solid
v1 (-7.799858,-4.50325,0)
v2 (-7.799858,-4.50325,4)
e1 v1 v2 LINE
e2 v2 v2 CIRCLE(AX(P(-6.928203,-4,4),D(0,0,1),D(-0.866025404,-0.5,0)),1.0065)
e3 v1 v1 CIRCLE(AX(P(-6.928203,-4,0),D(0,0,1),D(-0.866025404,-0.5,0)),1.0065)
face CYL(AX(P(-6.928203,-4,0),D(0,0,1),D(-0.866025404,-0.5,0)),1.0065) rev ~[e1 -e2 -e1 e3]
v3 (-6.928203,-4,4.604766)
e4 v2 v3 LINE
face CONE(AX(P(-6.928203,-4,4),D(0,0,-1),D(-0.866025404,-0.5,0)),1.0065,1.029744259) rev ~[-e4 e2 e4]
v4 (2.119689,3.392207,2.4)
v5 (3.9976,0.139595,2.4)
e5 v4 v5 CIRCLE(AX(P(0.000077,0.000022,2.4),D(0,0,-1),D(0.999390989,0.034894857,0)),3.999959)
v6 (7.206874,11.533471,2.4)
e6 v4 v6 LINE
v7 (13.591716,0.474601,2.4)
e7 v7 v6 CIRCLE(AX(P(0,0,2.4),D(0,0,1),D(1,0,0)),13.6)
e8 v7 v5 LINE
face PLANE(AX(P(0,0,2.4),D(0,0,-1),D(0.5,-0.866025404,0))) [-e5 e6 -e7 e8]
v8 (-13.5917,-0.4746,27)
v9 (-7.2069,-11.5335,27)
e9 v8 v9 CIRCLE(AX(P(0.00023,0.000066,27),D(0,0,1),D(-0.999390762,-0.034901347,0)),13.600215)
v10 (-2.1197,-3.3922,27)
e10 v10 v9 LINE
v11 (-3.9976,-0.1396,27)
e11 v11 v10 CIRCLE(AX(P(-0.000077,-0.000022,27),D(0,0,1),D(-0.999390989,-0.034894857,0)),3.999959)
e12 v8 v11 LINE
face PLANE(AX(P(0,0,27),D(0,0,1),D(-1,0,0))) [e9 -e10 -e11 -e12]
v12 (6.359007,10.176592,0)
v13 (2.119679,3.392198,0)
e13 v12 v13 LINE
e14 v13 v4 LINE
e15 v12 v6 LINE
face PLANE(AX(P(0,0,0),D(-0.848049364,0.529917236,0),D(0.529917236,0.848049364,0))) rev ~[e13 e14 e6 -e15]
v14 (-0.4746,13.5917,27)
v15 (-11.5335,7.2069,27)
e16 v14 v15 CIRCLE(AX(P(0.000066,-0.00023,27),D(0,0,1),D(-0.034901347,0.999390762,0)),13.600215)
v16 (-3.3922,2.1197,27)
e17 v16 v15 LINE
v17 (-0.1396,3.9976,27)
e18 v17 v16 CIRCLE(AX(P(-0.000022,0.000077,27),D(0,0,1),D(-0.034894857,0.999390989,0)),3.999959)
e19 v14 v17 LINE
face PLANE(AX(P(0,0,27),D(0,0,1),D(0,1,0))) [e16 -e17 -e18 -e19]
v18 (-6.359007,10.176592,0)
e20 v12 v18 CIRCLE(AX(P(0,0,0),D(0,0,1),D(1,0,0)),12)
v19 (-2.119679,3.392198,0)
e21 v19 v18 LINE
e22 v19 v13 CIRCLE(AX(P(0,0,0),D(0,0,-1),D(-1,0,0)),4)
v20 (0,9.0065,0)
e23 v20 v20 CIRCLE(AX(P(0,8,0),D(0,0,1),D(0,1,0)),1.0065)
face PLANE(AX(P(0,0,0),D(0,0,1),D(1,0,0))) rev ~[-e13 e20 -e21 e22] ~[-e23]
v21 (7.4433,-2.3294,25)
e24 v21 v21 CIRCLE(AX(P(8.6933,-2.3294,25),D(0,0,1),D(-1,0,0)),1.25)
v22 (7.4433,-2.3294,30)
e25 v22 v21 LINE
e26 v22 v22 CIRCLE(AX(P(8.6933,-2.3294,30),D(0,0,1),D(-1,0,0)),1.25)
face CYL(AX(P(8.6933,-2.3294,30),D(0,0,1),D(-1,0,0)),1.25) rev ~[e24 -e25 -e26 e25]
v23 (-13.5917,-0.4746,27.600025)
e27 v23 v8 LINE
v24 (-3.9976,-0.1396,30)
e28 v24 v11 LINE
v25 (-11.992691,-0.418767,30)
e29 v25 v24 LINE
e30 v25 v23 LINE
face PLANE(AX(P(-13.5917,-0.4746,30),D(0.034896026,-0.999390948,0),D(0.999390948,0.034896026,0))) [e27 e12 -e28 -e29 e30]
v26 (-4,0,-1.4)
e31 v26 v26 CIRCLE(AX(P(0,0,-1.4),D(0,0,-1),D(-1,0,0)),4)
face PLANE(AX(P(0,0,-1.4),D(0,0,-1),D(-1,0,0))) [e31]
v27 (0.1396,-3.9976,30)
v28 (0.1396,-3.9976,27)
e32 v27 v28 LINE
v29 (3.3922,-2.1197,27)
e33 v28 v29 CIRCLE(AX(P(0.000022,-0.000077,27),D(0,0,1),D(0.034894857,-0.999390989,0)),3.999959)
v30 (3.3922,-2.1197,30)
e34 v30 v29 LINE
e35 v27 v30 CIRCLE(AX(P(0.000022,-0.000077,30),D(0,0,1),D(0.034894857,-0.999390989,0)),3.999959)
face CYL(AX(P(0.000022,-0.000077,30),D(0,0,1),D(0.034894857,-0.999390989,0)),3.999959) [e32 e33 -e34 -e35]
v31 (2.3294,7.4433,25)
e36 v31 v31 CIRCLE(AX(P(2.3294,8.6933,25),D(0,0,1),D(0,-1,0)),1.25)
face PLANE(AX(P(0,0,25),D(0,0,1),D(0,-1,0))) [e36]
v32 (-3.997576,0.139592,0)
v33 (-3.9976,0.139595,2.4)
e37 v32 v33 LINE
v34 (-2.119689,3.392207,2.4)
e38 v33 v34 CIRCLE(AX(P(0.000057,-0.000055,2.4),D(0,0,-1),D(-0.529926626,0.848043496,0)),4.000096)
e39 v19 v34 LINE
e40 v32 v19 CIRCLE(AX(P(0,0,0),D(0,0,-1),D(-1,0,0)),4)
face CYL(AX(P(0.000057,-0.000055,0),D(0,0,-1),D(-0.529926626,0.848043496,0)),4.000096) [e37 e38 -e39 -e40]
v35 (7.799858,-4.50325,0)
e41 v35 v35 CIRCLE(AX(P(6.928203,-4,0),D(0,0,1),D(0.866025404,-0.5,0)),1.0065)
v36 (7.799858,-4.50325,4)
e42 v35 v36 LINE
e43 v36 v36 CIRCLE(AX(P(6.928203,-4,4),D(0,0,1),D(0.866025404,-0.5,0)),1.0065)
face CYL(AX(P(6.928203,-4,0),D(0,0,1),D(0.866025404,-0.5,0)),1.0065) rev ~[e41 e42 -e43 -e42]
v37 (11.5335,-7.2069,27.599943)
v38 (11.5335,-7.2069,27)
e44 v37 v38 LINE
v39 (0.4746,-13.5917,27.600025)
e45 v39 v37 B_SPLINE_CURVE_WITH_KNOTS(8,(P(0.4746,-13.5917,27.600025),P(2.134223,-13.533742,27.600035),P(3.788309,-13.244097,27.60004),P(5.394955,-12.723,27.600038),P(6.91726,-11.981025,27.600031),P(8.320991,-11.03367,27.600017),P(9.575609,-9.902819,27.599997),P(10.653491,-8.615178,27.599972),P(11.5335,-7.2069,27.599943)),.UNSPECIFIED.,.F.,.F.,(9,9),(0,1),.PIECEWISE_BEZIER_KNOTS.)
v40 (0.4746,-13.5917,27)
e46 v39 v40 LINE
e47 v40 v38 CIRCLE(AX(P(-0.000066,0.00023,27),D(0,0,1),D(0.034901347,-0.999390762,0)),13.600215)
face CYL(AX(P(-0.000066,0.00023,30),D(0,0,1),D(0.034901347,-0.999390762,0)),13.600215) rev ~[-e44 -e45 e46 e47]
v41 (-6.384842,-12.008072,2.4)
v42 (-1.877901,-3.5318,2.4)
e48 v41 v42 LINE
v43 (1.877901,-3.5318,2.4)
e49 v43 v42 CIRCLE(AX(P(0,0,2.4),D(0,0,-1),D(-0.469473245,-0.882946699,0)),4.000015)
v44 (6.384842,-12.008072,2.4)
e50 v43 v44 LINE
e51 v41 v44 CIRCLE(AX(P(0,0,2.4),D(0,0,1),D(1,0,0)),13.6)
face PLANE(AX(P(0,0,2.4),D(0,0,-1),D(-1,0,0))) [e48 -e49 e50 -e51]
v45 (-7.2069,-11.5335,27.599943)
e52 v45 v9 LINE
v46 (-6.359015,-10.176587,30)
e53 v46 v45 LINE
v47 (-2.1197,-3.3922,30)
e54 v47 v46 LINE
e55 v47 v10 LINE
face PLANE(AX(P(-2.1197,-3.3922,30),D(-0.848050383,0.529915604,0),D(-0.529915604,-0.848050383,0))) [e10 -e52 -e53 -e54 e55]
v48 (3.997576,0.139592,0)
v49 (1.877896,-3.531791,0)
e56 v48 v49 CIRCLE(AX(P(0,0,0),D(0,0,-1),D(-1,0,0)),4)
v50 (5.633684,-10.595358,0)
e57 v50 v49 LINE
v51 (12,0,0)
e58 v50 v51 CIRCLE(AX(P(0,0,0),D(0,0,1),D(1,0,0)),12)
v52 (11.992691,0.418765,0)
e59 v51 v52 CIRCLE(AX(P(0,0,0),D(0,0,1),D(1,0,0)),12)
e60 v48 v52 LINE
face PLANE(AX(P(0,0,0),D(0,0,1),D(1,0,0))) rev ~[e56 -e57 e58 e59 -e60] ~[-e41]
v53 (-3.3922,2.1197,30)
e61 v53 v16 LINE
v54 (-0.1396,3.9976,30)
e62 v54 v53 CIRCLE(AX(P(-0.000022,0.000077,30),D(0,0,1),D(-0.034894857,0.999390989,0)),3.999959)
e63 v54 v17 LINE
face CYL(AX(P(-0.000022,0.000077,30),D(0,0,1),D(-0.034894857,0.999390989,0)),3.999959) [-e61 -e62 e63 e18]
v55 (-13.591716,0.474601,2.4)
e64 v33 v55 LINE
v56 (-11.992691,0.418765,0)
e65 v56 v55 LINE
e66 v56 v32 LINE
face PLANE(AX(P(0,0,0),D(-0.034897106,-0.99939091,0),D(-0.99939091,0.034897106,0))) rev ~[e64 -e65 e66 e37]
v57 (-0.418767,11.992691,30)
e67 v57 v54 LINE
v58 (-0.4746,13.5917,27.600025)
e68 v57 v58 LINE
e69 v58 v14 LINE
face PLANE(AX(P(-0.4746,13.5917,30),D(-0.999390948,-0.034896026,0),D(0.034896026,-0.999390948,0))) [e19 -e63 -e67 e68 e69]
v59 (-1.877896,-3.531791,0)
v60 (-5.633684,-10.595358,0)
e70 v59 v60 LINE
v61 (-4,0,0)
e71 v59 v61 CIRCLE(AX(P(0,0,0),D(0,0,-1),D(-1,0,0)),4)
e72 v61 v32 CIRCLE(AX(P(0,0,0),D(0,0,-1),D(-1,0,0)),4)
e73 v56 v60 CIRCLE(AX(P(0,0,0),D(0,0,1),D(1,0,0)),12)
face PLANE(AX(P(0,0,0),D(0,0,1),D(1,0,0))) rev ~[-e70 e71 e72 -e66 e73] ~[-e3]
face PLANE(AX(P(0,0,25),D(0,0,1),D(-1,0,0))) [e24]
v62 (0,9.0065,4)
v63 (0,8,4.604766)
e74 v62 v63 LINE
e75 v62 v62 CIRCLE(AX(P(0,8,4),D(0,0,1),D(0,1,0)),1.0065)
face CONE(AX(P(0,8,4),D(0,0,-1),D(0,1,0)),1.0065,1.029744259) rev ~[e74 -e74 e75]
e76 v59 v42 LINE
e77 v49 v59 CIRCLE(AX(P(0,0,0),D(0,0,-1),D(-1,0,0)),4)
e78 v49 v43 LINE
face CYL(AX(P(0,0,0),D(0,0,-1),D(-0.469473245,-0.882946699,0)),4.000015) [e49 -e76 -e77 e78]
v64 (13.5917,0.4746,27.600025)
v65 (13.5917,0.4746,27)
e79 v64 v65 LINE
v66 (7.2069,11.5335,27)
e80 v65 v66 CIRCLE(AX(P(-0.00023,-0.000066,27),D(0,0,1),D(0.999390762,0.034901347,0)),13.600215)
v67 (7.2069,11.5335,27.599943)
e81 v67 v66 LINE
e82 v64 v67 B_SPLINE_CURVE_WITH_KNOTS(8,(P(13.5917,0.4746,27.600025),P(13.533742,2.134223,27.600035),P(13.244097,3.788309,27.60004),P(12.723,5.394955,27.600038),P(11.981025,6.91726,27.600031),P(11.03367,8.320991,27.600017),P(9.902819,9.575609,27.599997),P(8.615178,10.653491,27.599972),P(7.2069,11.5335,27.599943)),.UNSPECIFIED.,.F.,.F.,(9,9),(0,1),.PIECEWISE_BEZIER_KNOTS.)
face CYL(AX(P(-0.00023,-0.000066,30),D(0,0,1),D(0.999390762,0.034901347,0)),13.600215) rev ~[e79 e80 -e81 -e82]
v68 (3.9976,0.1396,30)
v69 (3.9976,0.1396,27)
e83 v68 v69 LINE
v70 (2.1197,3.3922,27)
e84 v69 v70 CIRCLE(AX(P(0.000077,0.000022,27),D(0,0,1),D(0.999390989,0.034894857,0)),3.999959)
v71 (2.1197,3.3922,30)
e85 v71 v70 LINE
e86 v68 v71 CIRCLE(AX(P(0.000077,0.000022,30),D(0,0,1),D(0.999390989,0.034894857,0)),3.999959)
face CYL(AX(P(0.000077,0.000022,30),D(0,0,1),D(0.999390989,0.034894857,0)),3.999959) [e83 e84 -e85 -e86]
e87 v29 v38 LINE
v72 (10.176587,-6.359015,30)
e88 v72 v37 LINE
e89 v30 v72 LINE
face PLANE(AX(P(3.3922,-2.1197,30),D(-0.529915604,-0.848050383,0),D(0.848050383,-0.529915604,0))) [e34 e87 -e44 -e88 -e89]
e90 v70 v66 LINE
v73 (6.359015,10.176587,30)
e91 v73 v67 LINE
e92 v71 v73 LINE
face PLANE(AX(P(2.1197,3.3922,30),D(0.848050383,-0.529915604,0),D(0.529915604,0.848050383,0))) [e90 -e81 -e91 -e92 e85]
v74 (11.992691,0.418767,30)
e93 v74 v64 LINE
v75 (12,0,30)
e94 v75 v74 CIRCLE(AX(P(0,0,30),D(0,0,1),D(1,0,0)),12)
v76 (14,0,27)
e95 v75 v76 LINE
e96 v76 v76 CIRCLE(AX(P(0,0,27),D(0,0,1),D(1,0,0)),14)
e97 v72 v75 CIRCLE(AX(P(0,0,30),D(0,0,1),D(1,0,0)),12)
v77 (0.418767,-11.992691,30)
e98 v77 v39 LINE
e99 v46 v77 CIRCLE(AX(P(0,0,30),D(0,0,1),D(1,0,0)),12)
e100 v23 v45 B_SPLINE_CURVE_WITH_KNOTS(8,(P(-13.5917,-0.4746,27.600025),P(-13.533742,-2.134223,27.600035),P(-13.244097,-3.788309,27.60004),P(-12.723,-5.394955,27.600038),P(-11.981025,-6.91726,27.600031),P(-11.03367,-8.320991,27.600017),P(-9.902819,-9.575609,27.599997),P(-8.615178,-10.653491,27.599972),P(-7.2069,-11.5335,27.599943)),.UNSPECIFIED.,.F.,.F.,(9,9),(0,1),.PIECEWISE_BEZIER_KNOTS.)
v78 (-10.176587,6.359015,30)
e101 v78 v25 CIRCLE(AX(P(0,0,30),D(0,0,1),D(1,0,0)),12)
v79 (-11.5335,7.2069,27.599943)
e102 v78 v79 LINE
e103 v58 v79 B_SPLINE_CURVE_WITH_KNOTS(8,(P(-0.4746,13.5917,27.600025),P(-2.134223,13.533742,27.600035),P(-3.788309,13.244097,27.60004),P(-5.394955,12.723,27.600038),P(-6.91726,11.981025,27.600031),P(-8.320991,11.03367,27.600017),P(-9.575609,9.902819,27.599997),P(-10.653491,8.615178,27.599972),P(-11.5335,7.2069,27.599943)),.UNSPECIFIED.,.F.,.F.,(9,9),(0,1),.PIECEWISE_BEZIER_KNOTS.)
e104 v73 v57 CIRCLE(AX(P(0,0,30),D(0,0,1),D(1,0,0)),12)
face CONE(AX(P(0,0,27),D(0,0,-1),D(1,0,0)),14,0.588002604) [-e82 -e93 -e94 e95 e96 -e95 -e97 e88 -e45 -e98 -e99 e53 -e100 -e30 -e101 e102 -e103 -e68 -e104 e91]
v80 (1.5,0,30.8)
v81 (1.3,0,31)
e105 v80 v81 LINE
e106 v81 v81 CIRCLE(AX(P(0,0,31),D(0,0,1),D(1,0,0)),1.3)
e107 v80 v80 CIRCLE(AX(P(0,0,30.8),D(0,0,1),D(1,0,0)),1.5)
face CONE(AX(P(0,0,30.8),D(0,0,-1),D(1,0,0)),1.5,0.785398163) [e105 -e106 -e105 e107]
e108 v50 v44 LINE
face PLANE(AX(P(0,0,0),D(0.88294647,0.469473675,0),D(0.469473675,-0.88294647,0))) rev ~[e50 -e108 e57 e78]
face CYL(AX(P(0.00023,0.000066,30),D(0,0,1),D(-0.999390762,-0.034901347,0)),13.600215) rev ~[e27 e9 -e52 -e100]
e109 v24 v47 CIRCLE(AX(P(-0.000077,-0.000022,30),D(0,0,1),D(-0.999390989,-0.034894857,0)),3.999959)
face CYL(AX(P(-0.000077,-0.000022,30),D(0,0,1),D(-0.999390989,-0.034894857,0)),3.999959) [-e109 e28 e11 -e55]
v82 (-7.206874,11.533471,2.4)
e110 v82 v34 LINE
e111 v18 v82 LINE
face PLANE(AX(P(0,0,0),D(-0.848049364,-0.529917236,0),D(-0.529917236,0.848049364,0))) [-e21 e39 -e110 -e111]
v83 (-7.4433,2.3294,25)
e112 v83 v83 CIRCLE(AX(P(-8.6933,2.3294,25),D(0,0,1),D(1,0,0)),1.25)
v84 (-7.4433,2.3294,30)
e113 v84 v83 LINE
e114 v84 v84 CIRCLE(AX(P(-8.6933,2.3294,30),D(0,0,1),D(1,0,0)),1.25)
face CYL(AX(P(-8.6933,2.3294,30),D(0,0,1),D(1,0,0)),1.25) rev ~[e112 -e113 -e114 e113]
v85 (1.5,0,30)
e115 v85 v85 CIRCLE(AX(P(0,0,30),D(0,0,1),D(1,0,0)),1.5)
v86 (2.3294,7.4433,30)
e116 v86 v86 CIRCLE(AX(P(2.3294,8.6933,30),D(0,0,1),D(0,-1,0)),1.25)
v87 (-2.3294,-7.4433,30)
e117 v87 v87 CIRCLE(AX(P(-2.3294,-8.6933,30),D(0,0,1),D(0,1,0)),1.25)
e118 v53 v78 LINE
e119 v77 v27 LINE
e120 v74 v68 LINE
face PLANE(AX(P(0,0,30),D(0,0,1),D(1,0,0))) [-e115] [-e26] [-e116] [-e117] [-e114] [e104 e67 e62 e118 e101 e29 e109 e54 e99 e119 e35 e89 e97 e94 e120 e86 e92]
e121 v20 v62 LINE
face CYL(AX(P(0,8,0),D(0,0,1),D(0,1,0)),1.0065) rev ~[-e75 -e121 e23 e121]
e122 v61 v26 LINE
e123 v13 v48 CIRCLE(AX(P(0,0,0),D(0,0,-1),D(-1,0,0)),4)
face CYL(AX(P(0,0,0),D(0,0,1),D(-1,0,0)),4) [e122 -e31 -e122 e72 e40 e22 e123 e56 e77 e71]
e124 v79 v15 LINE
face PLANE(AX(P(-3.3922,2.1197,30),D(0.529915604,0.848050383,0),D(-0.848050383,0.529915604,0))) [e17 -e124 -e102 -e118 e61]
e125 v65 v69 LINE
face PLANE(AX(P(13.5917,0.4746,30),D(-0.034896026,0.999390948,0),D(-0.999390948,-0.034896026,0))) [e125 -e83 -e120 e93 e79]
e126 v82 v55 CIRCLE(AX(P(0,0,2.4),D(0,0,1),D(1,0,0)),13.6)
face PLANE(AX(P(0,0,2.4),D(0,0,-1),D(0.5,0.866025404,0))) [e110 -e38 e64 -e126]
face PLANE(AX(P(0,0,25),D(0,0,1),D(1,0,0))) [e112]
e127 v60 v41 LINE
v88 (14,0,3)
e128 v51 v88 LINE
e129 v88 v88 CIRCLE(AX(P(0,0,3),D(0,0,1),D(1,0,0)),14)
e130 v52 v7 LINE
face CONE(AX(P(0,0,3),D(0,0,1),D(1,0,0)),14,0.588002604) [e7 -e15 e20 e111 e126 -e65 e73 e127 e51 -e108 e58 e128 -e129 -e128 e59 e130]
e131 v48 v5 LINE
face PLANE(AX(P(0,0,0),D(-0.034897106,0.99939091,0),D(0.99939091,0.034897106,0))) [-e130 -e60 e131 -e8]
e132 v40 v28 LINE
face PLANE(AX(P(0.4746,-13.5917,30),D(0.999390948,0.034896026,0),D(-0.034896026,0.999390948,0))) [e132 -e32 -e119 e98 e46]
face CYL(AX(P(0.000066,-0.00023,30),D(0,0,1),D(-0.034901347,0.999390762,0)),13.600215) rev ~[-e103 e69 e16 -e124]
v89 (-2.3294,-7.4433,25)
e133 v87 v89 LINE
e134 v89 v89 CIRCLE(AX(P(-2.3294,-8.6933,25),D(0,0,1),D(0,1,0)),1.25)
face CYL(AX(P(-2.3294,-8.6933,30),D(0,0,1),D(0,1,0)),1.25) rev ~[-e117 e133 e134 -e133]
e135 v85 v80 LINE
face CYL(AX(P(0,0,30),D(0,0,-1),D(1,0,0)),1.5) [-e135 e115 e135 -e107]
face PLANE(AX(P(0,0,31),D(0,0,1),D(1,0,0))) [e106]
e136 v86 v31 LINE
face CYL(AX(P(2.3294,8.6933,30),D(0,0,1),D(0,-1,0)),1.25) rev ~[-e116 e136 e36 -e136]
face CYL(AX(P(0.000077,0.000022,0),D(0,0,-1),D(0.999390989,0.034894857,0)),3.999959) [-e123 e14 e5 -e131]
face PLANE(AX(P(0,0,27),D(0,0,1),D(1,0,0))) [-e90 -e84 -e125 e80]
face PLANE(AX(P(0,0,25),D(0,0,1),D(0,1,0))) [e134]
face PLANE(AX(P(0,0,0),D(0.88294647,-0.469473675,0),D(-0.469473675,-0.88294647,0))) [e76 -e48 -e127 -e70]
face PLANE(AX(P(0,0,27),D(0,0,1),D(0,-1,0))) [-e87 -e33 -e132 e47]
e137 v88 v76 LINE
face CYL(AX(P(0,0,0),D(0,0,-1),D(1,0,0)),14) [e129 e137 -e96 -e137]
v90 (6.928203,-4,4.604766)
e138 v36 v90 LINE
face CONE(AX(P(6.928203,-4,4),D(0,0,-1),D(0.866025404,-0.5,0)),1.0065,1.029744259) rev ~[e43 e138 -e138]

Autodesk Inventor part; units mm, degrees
ref_plane "XZ Plane" through (0, 0, 0) normal (0, 1, 0) x (-1, 0, 0)
ref_plane "XY Plane" through (0, 0, 0) normal (0, 0, 1) x (1, 0, 0)
sketch "Sketch1" plane through (0, 0, 0) normal (0, 0, 1) x (1, 0, 0)
  circle A0 centre (0, 0) radius 14
  dimension "d0" = 28
extrude "Extrusion1" add sketch "Sketch1" along normal blind 30
chamfer "Chamfer1" distance 2 distance2 3 1 edges at (-14, 0, 0) measured on face at (0.5625, 1.5565, 0)
chamfer "Chamfer2" distance 2 distance2 3 1 edges at (-14, 0, 30) measured on face at (0.5625, 1.5565, 30)
sketch "Sketch2" plane through (0, 0, 0) normal (0, 0, -1) x (-1, 0, 0)
  circle A0 centre (0, 0) radius 12 projected
  circle A1 centre (0, 0) radius 4
  dimension "d9" = 8
extrude "Extrusion2" add sketch "Sketch2" along normal blind 1.4 contours A1
sketch "Sketch3" plane through (0, 0, 0) normal (0, 0, -1) x (-1, 0, 0)
  circle A0 centre (0, 0) radius 4 projected
  circle A1 centre (0, 0) radius 12 projected
  line L0 (0, 0) -> (0, -20.1603) construction
  line L1 (0, 0) -> (8.5074, -16)
  line L2 (8.5074, -16) -> (0, -16)
  line L3 (0, 0) -> (-8.5074, -16)
  line L4 (-8.5074, -16) -> (0, -16)
  dimension "d12" = 28
  dimension "d13" = 16
extrude "Extrusion3" cut sketch "Sketch3" against normal blind 2.4 contours L3 L1 A0 | A0 L1 A1 L3 | A1 L1 L2 L4 L3 picked at (0.9485, -2.471) picked at (3.4716, -8.5902)
pattern_circular "Circular Pattern1" count 3 over 360 about axis through (0, 0, 0) along (0, 0, -1) of "Extrusion3"
sketch "Sketch4" plane through (0, 0, 0) normal (0, 0, -1) x (-1, 0, 0)
  arc A0 (2.1197, 3.3922) -> (-2.1197, 3.3922) centre (0, 0) ccw projected
  arc A1 (6.359, 10.1766) -> (-6.359, 10.1766) centre (0, 0) ccw projected
  line L0 (0, 0) -> (0, 17.8727) construction
  point P0 (0, 8)
  dimension "d19" = 8
hole "Hole1" at (0, 8, 0) direction (0, 0, 1) diameter 2.013 depth 4 tip angle 118 thread size "M2.5x0.45" class "6H" standard "ANSI Metric M Profile"
pattern_circular "Circular Pattern2" count 3 over 360 about axis through (0, 0, 0) along (0, 0, -1) of "Hole1"
sketch "Sketch6" plane through (0, 0, 0) normal (0, 0, 1) x (1, 0, 0)
  arc A0 (-1.8779, -3.5318) -> (1.8779, -3.5318) centre (0, 0) ccw projected
  line L0 (1.8779, -3.5318) -> (0, 0) projected
  line L1 (0, 0) -> (-1.8779, -3.5318) projected
  arc A1 (-2.1197, 3.3922) -> (-3.9976, 0.1396) centre (0, 0) ccw projected
  line L2 (-3.9976, 0.1396) -> (0, 0) projected
  line L3 (0, 0) -> (-2.1197, 3.3922) projected
  arc A2 (3.9976, 0.1396) -> (2.1197, 3.3922) centre (0, 0) ccw projected
  line L4 (2.1197, 3.3922) -> (0, 0) projected
  line L5 (0, 0) -> (3.9976, 0.1396) projected
extrude "Extrusion4" add sketch "Sketch6" along normal up to next
sketch "Sketch7" plane through (0, 0, 30) normal (0, 0, 1) x (1, 0, 0)
  arc A0 (3.9976, 0.1396) -> (2.1197, 3.3922) centre (0, 0) ccw projected
  line L0 (2.1197, 3.3922) -> (7.2069, 11.5335) projected
  arc A1 (13.5917, 0.4746) -> (7.2069, 11.5335) centre (0, 0) ccw projected
  line L1 (13.5917, 0.4746) -> (3.9976, 0.1396) projected
extrude "Extrusion5" cut sketch "Sketch7" against normal blind 3
pattern_circular "Circular Pattern3" count 4 over 360 about axis through (0, 0, 0) along (0, 0, 1) of "Extrusion5"
sketch "Sketch8" plane through (0, 0, 30) normal (0, 0, 1) x (1, 0, 0)
  arc A0 (-10.1766, 6.359) -> (-11.9927, -0.4188) centre (0, 0) ccw projected
  circle A1 centre (0, 0) radius 1.5
  dimension "d37" = 3
extrude "Extrusion6" add sketch "Sketch8" along normal blind 1
chamfer "Chamfer3" distance 0.2 angle 45 1 edges at (-1.5, 0, 31)
sketch "Sketch9" plane through (0, 0, 30) normal (0, 0, 1) x (1, 0, 0)
  circle A0 centre (0, 0) radius 1.5 projected
  arc A1 (-10.1766, 6.359) -> (-11.9927, -0.4188) centre (0, 0) ccw projected
  arc A2 (-6.359, -10.1766) -> (0.4188, -11.9927) centre (0, 0) ccw projected
  line L0 (0, 0) -> (-11.5911, 3.1058) construction
  circle A3 centre (-8.6933, 2.3294) radius 1.25
  dimension "d43" = 2.5
  dimension "d44" = 9
extrude "Extrusion7" cut sketch "Sketch9" against normal blind 5 contours A3
pattern_circular "Circular Pattern4" count 4 over 360 about axis through (0, 0, 30) along (0, 0, 1) of "Extrusion7"
ref_plane "Work Plane1" through (14, 0, 0) normal (1, 0, 0) x (0, 1, 0)
sketch "Sketch10" plane through (14, 0, 0) normal (1, 0, 0) x (0, 1, 0)
  line L0 (18.3657, 31.0207) -> (17.8778, 30.841) construction
  line L1 (14, 27) -> (-14, 27) construction
  line L2 (-14, 3) -> (14, 3) construction
  line L3 (-7.4484, 3) -> (-7.4484, 27) construction
  line L4 (-7.4484, 27) -> (7.4484, 27) construction
  line L5 (7.4484, 27) -> (7.4484, 3) construction
  line L6 (7.4484, 3) -> (-7.4484, 3) construction
  point P0 (0, 3)
  point P1 (0, 27)
decal "Decal1"
properties part number "2830-1100 KV MOTOR"
